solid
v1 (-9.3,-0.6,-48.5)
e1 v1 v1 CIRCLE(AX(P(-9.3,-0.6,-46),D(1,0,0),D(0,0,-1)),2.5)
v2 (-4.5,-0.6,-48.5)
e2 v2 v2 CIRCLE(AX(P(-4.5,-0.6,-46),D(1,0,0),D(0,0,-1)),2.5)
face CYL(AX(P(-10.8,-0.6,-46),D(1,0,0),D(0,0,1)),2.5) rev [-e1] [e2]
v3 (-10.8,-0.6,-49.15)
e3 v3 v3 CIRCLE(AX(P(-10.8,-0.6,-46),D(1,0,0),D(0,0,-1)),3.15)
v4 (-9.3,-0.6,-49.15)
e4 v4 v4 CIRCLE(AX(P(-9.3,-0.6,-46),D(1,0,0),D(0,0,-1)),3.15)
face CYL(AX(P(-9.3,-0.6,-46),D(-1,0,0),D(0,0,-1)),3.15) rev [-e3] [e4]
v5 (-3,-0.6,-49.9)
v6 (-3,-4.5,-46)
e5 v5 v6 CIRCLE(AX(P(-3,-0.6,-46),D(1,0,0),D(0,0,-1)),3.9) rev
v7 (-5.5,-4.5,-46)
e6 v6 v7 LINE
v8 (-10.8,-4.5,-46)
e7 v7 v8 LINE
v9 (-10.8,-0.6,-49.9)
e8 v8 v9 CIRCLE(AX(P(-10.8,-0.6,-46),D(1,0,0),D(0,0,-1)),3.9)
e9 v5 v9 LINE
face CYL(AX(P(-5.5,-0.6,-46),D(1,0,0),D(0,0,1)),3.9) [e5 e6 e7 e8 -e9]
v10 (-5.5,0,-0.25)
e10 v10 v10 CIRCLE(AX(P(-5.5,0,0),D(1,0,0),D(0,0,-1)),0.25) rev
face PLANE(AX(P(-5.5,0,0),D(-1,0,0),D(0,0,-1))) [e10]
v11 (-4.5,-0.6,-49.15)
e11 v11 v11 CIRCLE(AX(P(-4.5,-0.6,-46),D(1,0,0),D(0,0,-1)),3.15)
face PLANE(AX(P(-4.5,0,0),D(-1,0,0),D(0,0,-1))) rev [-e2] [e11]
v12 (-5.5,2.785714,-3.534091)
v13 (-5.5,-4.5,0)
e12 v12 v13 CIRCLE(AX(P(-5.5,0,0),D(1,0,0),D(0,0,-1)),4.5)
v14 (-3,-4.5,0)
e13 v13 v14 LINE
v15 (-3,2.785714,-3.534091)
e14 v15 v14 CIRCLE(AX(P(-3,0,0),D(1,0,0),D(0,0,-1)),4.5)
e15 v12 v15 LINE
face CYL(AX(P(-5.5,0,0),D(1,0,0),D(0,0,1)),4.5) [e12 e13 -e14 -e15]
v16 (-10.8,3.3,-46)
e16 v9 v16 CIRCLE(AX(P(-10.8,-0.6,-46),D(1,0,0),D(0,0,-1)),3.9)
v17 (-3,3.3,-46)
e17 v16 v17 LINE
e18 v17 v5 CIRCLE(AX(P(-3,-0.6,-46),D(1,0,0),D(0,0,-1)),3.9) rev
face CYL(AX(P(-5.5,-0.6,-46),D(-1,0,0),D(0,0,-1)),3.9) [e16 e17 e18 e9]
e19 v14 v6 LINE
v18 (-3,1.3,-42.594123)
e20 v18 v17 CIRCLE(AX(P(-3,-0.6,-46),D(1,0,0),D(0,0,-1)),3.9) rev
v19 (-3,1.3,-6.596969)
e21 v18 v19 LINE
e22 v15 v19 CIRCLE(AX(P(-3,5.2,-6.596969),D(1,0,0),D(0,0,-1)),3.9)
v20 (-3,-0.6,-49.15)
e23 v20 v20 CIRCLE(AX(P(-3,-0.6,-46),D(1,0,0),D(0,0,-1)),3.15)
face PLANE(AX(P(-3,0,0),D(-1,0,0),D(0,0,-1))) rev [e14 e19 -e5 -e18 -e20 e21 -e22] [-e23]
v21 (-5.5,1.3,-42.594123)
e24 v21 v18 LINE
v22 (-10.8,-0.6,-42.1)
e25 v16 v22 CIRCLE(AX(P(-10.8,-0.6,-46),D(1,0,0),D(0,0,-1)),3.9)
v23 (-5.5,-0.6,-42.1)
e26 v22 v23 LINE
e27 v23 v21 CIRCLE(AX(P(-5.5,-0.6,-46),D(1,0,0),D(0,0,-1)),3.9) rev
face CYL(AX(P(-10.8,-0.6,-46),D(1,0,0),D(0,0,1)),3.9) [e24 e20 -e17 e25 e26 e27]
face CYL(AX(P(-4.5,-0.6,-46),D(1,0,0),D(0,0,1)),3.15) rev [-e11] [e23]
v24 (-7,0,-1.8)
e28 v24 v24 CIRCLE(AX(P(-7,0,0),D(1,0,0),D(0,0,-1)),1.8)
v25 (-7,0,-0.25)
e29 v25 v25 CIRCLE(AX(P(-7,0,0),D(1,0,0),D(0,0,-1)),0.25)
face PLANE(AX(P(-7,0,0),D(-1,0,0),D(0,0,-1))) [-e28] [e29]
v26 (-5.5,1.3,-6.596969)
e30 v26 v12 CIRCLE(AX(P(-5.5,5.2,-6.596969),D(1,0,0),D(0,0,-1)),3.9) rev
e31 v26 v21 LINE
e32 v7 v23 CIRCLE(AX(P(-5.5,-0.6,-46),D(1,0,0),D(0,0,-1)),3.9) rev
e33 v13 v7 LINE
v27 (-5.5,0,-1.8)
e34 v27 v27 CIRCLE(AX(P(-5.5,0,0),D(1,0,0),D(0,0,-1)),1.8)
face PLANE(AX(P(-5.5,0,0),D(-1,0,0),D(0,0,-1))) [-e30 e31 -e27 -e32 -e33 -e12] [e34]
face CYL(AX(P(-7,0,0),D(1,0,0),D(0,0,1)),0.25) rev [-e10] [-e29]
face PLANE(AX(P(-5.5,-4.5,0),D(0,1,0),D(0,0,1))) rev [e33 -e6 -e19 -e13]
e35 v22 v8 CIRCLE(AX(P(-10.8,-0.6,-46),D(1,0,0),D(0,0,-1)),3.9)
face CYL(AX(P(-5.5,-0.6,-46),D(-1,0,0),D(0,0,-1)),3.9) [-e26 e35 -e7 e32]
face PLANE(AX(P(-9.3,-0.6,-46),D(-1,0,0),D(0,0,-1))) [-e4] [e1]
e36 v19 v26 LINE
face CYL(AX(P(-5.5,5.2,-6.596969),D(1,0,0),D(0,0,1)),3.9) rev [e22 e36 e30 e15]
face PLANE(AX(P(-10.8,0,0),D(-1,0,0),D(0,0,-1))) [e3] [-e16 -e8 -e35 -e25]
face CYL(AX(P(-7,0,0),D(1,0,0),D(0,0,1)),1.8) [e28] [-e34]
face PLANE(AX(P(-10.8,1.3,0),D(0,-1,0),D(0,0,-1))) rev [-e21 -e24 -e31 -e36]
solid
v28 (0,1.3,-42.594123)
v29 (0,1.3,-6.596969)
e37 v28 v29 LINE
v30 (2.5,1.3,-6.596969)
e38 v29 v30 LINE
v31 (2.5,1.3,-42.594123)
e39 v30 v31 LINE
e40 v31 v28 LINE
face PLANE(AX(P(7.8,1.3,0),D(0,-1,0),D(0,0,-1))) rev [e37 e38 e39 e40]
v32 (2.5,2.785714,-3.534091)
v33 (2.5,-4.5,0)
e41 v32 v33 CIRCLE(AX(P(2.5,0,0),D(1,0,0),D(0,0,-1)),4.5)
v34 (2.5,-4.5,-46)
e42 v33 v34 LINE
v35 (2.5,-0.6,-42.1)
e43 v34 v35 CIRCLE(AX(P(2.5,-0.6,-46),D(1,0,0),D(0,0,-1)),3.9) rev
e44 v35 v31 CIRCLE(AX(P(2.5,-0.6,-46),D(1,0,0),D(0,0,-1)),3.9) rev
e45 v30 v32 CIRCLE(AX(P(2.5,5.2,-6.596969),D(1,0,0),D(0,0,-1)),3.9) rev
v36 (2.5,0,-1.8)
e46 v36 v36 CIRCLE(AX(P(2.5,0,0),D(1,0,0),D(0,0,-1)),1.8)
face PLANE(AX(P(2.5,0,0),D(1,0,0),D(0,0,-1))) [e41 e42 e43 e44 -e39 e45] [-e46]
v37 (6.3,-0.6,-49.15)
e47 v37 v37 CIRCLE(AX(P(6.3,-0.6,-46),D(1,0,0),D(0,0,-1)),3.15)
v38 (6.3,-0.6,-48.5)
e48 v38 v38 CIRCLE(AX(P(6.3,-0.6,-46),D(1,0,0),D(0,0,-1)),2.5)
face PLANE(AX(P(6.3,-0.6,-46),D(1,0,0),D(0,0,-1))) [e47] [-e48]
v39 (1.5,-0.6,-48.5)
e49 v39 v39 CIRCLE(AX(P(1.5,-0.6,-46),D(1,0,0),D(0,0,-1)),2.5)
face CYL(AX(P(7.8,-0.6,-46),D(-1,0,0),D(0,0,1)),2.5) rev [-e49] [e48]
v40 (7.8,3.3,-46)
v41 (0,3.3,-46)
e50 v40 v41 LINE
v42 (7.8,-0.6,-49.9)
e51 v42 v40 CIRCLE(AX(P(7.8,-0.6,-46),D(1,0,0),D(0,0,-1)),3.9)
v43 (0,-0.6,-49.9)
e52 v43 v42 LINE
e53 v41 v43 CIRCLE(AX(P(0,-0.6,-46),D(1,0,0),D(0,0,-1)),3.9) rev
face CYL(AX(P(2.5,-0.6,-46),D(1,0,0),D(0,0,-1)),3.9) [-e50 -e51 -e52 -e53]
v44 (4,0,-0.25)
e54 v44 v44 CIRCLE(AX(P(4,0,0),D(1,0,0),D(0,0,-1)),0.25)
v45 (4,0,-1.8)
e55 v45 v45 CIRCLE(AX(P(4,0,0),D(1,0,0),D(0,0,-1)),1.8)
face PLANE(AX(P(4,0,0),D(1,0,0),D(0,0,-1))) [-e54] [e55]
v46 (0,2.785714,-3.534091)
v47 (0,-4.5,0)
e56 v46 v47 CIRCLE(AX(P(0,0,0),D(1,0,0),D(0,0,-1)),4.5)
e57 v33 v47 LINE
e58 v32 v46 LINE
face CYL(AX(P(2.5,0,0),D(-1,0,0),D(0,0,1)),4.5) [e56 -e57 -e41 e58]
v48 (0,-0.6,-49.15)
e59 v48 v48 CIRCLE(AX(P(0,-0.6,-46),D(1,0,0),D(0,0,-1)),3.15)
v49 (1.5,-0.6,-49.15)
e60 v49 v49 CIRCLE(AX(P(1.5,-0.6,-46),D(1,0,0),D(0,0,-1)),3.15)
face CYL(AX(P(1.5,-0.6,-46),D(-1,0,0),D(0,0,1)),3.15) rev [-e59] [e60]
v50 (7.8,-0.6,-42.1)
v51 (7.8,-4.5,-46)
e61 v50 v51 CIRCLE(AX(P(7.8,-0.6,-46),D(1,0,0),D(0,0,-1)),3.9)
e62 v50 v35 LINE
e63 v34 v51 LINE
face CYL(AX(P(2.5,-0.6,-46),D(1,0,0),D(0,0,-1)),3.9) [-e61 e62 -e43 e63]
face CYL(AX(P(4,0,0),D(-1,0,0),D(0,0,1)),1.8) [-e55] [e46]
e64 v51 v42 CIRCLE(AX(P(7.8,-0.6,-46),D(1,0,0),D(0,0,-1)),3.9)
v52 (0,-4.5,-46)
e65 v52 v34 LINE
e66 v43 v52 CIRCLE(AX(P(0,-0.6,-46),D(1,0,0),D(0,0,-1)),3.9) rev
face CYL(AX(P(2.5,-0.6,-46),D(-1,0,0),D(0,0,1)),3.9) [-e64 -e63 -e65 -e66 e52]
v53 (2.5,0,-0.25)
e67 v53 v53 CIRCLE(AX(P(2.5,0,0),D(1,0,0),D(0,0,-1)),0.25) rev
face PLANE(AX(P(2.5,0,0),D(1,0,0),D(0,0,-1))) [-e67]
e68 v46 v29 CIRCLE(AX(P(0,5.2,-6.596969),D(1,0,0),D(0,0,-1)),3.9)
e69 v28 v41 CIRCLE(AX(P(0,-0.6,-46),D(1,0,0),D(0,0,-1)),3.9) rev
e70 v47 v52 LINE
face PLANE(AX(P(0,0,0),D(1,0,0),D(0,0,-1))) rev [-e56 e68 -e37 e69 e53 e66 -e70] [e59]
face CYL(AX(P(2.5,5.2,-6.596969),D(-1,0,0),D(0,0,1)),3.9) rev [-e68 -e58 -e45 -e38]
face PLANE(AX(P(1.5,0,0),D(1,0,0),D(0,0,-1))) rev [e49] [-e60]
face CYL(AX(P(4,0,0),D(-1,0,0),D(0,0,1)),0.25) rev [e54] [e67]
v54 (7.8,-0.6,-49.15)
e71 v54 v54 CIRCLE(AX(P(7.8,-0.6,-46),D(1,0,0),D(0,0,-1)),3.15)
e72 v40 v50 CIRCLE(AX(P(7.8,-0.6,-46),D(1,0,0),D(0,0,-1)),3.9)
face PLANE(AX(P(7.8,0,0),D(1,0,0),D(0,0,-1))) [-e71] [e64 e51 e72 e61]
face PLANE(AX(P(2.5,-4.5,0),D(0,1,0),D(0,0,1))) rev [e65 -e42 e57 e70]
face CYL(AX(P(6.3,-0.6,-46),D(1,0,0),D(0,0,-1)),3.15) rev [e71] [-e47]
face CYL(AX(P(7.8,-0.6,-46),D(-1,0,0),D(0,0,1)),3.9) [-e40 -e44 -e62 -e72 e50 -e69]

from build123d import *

# Parameters (mm, degrees)
SKETCH_1_R          = 4.5
SKETCH_1_W          = 49.9
SKETCH_1_H          = 7.8
EXTRUDE_1_DEPTH     = 2.5
EXTRUDE_START       = 2.5
SKETCH_1_6_R        = 1.8
SKETCH_1_6_R_2      = 0.25
EXTRUDE_3_DEPTH     = 1.5
SKETCH_1_5_W        = 7.8
SKETCH_1_5_H        = 7.8
EXTRUDE_2_DEPTH     = 7.8
SKETCH_1_7_R        = 2.5
CUT_EXTRUDE_1_DEPTH = 51.706015422
SKETCH_1_8_R        = 3.15
SKETCH_1_8_R_2      = 2.5
CUT_EXTRUDE_2_DEPTH = 1.5
CUT_EXTRUDE_START   = 6.3
SKETCH_1_9_R        = 3.15
SKETCH_1_9_R_2      = 2.5
CUT_EXTRUDE_3_DEPTH = 1.5
SKETCH_2_W          = 0.191868154
SKETCH_2_H          = 2
SKETCH_2_W_2        = 37.6
CUT_EXTRUDE_4_DEPTH = 51.706015422
FILLET_1_R          = 3.9


with BuildPart() as part:
    # 草图1 → 凸台-拉伸1 (new body)
    with BuildSketch(Plane(origin=(0, 0, 0), x_dir=(0, 0, -1), z_dir=(1, 0, 0))):
        Circle(SKETCH_1_R)
        with Locations((24.95, -0.6)):
            Rectangle(SKETCH_1_W, SKETCH_1_H)
    extrude(amount=EXTRUDE_1_DEPTH)

    # 草图1<6> → 凸台-拉伸3 (add)
    with BuildSketch(Plane(origin=(0, 0, 0), x_dir=(0, 0, -1), z_dir=(1, 0, 0)).offset(EXTRUDE_START)):
        Circle(SKETCH_1_6_R)
        Circle(SKETCH_1_6_R_2, mode=Mode.SUBTRACT)
    extrude(amount=EXTRUDE_3_DEPTH)

    # 草图1<5> → 凸台-拉伸2 (add)
    with BuildSketch(Plane(origin=(0, 0, 0), x_dir=(0, 0, -1), z_dir=(1, 0, 0))):
        with Locations((46, -0.6)):
            Rectangle(SKETCH_1_5_W, SKETCH_1_5_H)
    extrude(amount=EXTRUDE_2_DEPTH)

    # 草图1<7> → 切除-拉伸1 (cut, through all)
    with BuildSketch(Plane(origin=(0, 0, 0), x_dir=(0, 0, -1), z_dir=(1, 0, 0))):
        with Locations((46, -0.6)):
            Circle(SKETCH_1_7_R)
    extrude(amount=CUT_EXTRUDE_1_DEPTH, mode=Mode.SUBTRACT)

    # 草图1<8> → 切除-拉伸2 (cut)
    with BuildSketch(Plane(origin=(0, 0, 0), x_dir=(0, 0, -1), z_dir=(1, 0, 0))):
        with Locations((46, -0.6)):
            Circle(SKETCH_1_8_R)
        with Locations((46, -0.6)):
            Circle(SKETCH_1_8_R_2, mode=Mode.SUBTRACT)
    extrude(amount=CUT_EXTRUDE_2_DEPTH, mode=Mode.SUBTRACT)

    # 草图1<9> → 切除-拉伸3 (cut)
    with BuildSketch(Plane(origin=(0, 0, 0), x_dir=(0, 0, -1), z_dir=(1, 0, 0)).offset(CUT_EXTRUDE_START)):
        with Locations((46, -0.6)):
            Circle(SKETCH_1_9_R)
        with Locations((46, -0.6)):
            Circle(SKETCH_1_9_R_2, mode=Mode.SUBTRACT)
    extrude(amount=CUT_EXTRUDE_3_DEPTH, mode=Mode.SUBTRACT)

    # 草图2 → 切除-拉伸4 (cut, through all)
    with BuildSketch(Plane.ZY):
        with BuildLine():
            Line((-3.059411708, 3.3), (-4.308131846, 3.3))
            Line((-4.308131846, 3.3), (-4.308131846, 1.3))
            ThreePointArc((-4.308131846, 1.3), (-3.817089795, 2.383238447), (-3.059411708, 3.3))
        make_face()
        with Locations((-4.404065923, 2.3)):
            Rectangle(SKETCH_2_W, SKETCH_2_H)
        with Locations((-23.3, 2.3)):
            Rectangle(SKETCH_2_W_2, SKETCH_2_H)
    extrude(amount=-CUT_EXTRUDE_4_DEPTH, mode=Mode.SUBTRACT)

    # 圆角1
    fillet_1_edges = [part.edges().sort_by_distance(p)[0] for p in [
        (1.25, 1.3, -4.308131846),
    ]]
    fillet(fillet_1_edges, radius=FILLET_1_R)
    fillet_1_2_edges = [part.edges().sort_by_distance(p)[0] for p in [
        (3.9, -4.5, -49.9),
        (3.9, 3.3, -49.9),
        (5.15, -4.5, -42.1),
        (3.9, 3.3, -42.1),
    ]]
    fillet(fillet_1_2_edges, radius=FILLET_1_R - 0.0001)  # a hair under: the kernel refuses the full size


with BuildPart() as body_2:
    # 镜向1: mirrored copy
    add(part.part.mirror(Plane(origin=(-1.5, 0, 0), x_dir=(0, 0, 1), z_dir=(1, 0, 0))))


solid = Compound([part.part, body_2.part])
